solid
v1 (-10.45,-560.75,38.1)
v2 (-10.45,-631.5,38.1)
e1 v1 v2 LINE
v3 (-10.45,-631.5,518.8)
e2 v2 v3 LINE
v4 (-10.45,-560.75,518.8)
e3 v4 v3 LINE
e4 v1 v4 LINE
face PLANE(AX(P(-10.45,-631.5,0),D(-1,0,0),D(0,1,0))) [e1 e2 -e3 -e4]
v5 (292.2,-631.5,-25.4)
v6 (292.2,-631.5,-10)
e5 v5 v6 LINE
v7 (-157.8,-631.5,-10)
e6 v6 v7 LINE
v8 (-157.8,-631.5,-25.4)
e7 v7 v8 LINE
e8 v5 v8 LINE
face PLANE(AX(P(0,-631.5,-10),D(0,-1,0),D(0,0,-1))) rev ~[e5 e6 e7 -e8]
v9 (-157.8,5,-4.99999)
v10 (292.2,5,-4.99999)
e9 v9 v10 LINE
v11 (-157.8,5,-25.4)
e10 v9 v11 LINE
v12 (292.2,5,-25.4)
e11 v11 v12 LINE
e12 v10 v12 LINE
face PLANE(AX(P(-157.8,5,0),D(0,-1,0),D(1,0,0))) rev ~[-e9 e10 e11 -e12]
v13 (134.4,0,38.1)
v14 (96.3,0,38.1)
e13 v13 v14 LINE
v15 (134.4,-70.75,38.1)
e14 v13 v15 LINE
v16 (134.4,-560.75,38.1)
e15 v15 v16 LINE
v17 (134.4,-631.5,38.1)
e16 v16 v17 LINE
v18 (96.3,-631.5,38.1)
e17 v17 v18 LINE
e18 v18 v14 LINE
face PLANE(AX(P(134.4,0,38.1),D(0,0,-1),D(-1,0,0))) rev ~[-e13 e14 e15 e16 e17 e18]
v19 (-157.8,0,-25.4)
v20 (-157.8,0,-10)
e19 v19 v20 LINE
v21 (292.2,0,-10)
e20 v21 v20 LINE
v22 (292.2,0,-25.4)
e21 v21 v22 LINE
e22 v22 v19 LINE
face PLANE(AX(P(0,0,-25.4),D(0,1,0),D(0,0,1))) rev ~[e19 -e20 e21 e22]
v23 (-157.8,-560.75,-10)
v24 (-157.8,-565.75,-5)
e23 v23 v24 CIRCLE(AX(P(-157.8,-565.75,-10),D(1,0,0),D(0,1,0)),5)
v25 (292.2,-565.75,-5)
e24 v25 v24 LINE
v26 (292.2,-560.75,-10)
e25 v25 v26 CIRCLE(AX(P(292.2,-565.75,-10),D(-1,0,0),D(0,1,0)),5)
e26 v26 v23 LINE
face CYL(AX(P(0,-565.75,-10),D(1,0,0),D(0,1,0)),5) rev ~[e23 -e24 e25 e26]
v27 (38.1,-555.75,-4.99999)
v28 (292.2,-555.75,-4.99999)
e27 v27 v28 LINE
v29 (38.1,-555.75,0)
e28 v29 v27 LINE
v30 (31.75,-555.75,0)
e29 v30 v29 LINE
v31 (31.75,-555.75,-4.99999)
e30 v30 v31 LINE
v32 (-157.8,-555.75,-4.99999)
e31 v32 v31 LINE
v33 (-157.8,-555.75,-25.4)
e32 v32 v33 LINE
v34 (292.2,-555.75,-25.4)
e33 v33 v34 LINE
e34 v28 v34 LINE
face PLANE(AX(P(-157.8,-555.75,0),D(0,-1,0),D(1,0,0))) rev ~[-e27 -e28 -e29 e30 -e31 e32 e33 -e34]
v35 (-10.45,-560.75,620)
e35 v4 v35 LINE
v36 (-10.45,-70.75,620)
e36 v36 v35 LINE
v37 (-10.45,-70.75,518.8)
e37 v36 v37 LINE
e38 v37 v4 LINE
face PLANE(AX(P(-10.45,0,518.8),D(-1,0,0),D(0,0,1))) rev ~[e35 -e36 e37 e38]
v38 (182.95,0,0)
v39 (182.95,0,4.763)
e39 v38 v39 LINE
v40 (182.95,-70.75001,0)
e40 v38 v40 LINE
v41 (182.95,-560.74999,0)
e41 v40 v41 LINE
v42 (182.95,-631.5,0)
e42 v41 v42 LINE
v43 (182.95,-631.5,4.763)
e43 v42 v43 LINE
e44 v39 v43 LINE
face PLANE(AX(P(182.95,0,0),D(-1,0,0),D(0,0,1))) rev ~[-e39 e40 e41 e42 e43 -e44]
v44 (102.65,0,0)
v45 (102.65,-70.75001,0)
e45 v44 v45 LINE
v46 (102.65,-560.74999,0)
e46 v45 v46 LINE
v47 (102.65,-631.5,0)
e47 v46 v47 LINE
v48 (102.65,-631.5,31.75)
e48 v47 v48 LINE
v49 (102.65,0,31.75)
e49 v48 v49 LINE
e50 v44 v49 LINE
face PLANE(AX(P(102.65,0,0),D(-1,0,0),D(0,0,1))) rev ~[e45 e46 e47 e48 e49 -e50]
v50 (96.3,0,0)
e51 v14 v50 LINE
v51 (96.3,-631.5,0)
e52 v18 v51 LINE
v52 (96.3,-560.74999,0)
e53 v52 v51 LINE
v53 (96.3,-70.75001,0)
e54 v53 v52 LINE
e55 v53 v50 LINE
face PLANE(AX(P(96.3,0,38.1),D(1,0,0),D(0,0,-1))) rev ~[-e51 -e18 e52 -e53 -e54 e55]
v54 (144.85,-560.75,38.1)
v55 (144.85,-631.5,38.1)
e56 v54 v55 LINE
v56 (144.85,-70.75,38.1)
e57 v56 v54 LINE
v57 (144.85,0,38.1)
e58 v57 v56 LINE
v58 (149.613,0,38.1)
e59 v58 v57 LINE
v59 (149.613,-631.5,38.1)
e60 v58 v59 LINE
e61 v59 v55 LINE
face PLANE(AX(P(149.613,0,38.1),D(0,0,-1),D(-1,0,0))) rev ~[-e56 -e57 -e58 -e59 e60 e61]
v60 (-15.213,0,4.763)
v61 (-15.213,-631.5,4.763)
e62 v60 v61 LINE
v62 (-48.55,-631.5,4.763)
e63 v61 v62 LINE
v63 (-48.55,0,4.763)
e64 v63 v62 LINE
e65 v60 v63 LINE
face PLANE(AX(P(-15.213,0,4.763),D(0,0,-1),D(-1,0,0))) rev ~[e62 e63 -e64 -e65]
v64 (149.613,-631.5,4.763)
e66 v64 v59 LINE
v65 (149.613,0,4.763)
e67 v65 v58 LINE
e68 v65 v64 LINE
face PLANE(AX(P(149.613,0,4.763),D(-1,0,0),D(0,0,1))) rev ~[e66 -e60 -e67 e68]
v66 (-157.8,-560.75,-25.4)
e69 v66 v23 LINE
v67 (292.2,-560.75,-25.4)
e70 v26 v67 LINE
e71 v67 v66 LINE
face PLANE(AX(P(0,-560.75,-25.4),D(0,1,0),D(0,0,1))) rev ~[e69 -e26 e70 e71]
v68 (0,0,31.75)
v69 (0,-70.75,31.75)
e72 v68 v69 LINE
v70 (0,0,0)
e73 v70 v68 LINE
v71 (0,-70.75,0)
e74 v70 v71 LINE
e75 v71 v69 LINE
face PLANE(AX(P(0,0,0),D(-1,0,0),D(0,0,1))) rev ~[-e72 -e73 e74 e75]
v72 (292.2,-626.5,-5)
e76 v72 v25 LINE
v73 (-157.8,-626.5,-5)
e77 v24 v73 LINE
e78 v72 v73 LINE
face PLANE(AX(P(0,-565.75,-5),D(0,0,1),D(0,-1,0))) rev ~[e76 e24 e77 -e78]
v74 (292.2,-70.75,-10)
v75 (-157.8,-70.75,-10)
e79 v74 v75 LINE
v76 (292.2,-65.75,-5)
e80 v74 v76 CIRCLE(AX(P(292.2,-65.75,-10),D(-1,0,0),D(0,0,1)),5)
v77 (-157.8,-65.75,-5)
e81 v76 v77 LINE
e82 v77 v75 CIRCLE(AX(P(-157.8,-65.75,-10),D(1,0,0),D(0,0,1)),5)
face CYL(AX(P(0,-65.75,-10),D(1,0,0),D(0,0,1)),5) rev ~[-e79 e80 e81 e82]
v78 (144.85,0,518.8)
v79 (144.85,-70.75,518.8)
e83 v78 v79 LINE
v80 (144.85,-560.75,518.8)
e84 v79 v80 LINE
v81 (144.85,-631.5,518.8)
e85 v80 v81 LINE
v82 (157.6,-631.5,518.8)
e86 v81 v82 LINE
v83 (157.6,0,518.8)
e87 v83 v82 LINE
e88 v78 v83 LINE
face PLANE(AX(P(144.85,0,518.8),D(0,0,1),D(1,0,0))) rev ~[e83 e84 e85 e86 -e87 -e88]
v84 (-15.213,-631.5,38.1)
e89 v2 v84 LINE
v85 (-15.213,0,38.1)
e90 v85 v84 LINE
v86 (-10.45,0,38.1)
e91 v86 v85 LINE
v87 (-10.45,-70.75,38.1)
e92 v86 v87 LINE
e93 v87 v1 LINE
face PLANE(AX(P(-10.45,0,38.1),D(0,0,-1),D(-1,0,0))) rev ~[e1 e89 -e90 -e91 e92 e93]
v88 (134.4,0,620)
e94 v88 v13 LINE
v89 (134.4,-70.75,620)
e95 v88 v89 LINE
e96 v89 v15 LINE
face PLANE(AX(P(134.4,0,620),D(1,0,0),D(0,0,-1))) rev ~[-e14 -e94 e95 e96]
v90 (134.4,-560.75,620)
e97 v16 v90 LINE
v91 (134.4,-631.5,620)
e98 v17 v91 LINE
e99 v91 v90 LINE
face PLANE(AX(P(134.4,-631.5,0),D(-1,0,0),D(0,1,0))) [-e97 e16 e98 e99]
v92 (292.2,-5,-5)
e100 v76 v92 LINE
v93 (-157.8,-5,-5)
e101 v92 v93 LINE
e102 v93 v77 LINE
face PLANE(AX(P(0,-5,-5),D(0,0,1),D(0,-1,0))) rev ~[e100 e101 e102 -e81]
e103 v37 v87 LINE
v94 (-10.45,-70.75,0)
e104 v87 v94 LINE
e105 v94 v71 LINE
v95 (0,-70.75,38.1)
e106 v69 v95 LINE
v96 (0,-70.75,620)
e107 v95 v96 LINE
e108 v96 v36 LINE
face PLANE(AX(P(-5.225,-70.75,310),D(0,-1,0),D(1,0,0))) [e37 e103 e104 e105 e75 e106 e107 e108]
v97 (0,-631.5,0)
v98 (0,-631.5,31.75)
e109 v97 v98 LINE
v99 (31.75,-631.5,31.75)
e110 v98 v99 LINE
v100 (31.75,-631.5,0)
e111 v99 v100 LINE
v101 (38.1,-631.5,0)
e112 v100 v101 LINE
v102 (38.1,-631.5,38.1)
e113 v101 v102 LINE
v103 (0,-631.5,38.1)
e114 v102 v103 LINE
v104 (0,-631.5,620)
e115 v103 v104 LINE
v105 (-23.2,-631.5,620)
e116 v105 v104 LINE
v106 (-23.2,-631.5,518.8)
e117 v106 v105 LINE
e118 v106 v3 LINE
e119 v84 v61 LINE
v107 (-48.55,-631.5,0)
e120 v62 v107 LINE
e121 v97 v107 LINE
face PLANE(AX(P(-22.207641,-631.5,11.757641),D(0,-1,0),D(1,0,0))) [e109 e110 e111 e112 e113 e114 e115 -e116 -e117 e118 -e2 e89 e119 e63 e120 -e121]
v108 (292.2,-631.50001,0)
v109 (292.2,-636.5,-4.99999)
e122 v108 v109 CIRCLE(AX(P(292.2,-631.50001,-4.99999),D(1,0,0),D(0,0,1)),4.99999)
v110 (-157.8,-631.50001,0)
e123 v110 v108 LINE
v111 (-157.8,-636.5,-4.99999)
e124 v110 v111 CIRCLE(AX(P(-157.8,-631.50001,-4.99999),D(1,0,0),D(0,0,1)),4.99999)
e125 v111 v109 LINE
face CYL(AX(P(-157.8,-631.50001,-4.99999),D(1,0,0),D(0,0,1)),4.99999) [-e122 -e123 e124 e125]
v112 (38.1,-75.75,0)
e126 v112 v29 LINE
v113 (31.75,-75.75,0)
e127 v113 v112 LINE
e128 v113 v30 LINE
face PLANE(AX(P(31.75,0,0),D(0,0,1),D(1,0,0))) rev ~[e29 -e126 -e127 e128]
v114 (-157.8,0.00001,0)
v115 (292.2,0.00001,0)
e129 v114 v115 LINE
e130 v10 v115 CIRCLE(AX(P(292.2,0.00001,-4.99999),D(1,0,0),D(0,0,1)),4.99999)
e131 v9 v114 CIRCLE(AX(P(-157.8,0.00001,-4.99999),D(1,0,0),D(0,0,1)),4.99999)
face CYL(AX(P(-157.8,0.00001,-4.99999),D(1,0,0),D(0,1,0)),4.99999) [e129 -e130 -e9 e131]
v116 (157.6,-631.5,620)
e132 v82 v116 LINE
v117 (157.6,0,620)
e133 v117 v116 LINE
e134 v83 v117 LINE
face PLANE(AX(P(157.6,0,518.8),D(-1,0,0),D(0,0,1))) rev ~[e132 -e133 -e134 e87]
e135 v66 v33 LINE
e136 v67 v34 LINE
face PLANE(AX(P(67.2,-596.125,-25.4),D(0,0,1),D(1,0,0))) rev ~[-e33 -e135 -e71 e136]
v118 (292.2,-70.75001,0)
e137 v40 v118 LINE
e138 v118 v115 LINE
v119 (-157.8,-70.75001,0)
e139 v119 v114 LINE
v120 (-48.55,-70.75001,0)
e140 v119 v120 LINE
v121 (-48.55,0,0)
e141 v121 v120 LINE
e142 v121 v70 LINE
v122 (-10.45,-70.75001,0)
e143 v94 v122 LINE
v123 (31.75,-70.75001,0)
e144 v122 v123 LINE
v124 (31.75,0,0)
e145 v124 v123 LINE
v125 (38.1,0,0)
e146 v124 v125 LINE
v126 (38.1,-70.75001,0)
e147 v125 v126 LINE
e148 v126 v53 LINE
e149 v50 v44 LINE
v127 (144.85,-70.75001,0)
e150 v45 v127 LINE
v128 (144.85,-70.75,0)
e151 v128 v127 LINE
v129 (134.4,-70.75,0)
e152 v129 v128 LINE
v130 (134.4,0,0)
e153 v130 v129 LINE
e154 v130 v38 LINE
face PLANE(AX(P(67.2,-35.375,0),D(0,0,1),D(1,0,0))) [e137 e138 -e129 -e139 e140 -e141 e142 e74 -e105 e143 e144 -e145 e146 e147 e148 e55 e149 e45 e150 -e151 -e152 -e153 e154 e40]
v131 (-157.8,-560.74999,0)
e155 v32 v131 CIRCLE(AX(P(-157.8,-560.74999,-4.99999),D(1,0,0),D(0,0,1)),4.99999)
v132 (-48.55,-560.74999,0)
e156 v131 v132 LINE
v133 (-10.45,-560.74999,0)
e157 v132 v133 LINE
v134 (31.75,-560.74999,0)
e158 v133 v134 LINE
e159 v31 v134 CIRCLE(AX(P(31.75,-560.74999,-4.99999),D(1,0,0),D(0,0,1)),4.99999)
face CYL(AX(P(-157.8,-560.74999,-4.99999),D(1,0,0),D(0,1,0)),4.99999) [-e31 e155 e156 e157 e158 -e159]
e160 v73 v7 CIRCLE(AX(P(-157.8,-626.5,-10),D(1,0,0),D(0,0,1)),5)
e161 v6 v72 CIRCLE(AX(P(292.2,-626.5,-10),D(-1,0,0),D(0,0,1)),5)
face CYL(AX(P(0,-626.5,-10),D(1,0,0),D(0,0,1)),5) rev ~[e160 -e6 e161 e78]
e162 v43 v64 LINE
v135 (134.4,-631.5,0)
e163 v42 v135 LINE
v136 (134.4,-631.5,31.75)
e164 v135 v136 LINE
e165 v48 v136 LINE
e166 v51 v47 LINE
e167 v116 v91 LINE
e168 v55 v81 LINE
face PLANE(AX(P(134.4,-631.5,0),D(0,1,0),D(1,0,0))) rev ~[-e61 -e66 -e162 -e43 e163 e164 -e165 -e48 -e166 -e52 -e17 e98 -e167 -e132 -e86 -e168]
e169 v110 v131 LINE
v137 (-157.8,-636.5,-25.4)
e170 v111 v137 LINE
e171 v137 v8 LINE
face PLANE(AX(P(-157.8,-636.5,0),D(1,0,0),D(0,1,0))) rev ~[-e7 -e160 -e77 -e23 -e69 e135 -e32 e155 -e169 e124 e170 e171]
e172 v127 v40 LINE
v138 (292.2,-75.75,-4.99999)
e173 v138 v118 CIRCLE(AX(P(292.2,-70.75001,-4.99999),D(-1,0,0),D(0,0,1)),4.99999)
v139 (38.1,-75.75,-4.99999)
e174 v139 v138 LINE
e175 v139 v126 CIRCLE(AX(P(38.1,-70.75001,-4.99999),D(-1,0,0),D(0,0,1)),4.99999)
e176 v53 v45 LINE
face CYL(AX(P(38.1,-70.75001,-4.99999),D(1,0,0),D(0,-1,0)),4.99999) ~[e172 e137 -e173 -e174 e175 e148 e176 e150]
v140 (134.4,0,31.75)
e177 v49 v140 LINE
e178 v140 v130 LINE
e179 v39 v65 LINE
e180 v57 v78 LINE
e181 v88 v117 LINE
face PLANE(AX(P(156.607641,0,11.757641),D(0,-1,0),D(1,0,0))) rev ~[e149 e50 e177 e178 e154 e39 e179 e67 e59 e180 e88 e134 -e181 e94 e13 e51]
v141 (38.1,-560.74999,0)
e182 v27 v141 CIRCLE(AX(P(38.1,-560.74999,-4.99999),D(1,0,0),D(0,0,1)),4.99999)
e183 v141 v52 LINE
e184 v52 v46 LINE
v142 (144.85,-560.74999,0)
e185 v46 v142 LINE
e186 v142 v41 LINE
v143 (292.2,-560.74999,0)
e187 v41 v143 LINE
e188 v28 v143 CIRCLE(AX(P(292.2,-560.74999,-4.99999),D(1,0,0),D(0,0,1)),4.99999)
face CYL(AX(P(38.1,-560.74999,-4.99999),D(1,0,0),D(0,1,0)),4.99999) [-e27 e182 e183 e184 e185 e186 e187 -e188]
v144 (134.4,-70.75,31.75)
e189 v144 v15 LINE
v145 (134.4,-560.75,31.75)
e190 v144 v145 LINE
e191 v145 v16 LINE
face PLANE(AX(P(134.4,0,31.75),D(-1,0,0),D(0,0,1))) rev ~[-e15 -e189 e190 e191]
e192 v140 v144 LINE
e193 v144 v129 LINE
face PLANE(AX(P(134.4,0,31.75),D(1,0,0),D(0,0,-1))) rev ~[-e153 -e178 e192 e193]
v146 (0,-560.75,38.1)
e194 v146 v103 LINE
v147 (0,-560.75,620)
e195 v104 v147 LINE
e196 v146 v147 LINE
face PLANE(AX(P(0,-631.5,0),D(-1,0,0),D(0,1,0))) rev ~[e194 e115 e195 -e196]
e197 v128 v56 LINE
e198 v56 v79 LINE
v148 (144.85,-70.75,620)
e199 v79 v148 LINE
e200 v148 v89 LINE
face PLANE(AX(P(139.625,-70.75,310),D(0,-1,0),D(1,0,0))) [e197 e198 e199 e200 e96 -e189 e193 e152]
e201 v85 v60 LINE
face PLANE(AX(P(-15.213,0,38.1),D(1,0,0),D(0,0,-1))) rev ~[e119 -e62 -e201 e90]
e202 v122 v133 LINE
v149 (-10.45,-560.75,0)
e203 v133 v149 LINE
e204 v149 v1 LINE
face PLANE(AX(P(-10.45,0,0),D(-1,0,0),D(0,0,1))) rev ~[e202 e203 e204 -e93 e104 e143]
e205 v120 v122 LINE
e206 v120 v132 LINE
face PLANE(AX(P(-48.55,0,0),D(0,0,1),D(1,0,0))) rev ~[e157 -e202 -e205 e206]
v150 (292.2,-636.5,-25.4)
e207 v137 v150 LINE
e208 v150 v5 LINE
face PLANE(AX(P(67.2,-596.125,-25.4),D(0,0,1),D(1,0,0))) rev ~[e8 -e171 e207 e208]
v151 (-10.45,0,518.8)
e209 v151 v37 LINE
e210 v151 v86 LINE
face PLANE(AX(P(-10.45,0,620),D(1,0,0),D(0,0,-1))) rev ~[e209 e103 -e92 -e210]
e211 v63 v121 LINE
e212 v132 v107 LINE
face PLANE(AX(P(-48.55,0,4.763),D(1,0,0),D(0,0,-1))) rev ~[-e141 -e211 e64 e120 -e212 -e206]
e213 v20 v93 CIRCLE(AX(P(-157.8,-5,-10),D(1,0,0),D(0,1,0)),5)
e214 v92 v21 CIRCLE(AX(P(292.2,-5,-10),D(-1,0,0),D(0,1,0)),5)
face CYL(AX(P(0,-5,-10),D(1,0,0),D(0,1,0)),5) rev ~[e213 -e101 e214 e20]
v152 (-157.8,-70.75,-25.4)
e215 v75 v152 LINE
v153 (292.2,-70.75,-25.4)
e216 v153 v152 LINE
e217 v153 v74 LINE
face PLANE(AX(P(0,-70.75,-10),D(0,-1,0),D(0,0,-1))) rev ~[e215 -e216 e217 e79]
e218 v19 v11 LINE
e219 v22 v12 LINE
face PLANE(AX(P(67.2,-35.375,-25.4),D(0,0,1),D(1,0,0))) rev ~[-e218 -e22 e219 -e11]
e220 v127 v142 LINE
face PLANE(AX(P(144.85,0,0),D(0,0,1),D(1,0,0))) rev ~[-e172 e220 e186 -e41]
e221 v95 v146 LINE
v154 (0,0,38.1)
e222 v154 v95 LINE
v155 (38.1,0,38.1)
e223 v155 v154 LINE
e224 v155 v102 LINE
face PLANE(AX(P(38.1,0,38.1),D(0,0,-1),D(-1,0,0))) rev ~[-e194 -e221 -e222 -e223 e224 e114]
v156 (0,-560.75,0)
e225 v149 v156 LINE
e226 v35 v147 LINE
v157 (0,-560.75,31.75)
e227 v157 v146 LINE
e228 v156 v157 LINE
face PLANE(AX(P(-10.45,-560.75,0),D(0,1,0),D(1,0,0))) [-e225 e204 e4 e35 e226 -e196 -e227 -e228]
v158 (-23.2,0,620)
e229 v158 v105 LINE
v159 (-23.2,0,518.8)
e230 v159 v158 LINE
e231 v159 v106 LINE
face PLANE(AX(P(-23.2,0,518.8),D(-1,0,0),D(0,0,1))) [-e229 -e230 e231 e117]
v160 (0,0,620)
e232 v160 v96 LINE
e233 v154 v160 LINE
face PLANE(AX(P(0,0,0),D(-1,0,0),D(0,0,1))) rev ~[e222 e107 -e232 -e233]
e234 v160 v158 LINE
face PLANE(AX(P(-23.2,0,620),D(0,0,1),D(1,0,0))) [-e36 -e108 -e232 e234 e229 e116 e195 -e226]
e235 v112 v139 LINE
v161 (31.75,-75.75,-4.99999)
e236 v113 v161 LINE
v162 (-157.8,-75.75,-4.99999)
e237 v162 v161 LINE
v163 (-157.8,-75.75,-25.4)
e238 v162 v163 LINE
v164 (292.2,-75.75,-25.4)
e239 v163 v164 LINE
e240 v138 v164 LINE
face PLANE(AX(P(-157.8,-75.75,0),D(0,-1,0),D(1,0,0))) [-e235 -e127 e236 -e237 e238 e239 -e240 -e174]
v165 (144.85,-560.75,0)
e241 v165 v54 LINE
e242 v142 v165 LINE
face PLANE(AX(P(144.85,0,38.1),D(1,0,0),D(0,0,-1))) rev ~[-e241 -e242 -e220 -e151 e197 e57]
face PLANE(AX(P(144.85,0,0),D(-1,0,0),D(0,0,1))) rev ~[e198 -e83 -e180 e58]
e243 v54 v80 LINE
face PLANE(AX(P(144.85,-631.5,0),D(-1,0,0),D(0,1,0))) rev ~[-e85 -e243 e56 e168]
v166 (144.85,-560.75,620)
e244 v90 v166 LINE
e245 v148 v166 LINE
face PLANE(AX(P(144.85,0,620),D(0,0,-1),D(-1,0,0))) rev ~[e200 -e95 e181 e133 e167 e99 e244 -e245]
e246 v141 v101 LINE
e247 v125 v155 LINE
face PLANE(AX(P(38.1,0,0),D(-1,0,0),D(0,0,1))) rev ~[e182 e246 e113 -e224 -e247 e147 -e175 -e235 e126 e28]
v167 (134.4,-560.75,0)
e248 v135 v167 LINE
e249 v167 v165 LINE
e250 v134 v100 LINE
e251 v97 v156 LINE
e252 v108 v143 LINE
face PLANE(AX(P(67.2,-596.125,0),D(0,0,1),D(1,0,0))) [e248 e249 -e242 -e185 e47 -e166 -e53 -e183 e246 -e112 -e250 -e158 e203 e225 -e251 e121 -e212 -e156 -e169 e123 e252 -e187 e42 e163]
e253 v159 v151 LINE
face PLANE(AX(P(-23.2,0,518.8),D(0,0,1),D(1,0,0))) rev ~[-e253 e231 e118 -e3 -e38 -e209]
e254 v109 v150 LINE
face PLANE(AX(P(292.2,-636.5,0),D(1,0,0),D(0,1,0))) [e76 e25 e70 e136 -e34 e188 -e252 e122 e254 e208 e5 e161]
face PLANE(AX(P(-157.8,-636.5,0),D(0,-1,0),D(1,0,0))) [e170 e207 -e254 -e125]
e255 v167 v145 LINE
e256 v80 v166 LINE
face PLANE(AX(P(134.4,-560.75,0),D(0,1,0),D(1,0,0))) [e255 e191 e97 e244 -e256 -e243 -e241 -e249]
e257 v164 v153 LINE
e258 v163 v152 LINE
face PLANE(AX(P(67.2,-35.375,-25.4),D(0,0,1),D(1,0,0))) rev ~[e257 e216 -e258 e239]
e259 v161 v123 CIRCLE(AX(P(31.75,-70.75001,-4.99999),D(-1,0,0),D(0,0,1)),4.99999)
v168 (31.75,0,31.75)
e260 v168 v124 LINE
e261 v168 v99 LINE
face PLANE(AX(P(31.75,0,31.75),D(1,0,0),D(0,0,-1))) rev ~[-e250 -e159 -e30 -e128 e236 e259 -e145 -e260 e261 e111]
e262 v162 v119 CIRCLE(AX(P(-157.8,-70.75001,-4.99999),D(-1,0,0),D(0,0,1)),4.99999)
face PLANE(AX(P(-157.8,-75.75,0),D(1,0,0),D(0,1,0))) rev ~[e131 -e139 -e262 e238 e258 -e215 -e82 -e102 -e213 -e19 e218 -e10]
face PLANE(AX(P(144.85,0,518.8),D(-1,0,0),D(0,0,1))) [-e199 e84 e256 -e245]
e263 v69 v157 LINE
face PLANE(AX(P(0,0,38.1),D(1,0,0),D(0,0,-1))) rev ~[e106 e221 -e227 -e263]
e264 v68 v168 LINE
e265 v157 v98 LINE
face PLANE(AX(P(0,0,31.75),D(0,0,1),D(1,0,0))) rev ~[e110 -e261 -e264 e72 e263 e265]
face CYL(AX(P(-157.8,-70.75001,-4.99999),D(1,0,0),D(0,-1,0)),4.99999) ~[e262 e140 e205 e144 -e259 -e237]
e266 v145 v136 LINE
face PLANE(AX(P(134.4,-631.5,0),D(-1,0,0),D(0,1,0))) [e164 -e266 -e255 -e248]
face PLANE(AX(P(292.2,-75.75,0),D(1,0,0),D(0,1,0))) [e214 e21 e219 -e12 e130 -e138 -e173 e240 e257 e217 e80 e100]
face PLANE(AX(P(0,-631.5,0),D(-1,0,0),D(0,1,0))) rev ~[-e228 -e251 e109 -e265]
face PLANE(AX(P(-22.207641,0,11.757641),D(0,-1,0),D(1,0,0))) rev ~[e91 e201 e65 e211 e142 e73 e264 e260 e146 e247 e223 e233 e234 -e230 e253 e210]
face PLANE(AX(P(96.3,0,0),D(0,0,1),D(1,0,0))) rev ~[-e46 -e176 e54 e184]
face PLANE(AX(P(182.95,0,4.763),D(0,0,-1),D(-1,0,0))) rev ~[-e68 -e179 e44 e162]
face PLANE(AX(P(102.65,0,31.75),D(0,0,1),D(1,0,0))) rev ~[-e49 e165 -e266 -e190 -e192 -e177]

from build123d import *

# Parameters (mm, degrees)
F1_DEPTH  = 631.5
F2_DEPTH  = 70.75
F3_W      = 10.45
F3_H      = 70.75
F4_DEPTH  = 620
F5_W      = 450
F5_H      = 80.75
F6_DEPTH  = 25.4
F7_R      = 4.99999
F9_DEPTH  = 631.5
F10_DEPTH = 70.75
F11_W     = 10.45
F11_H     = 70.75
F12_DEPTH = 620
F13_W     = 12.75
F13_H     = 101.2
F14_DEPTH = 631.5
F16_DEPTH = 631.5
F18_DEPTH = 300
F19_DEPTH = 300


# Not quite as in the source:
# - a fillet or chamfer is up to 0.001 mm smaller than in the source, because OpenCascade refuses the exact size


with BuildPart() as f1:
    # F0 (on Front) → F1 (new body)
    with BuildSketch(Plane.XZ):
        Polygon((0, 38.1), (0, 31.75), (31.75, 31.75), (31.75, 0), (38.1, 0), (38.1, 38.1), align=None)
    extrude(amount=F1_DEPTH)

    # F0 (on Front) → F2 (join)
    with BuildSketch(Plane.XZ):
        Polygon((-10.45, 0), (0, 0), (0, 31.75), (0, 38.1), (0, 620), (-10.45, 620), align=None)
    extrude(amount=F2_DEPTH)

    # F3 (on Top) → F4 (join)
    with BuildSketch(Plane.XY):
        with Locations((-5.225, -596.125)):
            Rectangle(F3_W, F3_H)
    extrude(amount=F4_DEPTH)

    # F5 (on Top) → F6 (join)
    with BuildSketch(Plane.XY):
        with Locations((67.2, -35.375)):
            Rectangle(F5_W, F5_H)
        with Locations((67.2, -596.125)):
            Rectangle(F5_W, F5_H)
    extrude(amount=-F6_DEPTH)

    # F7 (radius 5 in the source; OpenCascade refuses exactly that, so slightly less here)
    f7_edges = [f1.edges().sort_by_distance(p)[0] for p in [
        (67.2, -636.5, 0),
        (165.15, -555.75, 0),
        (165.15, -75.75, 0),
        (67.2, 5, 0),
        (-63.025, -75.75, 0),
        (-63.025, -555.75, 0),
    ]]
    fillet(f7_edges, radius=F7_R)

    # F8 (on Front) → F9 (join)
    with BuildSketch(Plane.XZ):
        Polygon((102.65, 31.75), (134.4, 31.75), (134.4, 38.1), (96.3, 38.1), (96.3, 0), (102.65, 0), align=None)
    extrude(amount=F9_DEPTH)

    # F8 (on Front) → F10 (join)
    with BuildSketch(Plane.XZ):
        Polygon((134.4, 31.75), (134.4, 0), (144.85, 0), (144.85, 620), (134.4, 620), (134.4, 38.1), align=None)
        Polygon((102.65, 31.75), (134.4, 31.75), (134.4, 38.1), (96.3, 38.1), (96.3, 0), (102.65, 0), align=None)
    extrude(amount=F10_DEPTH)

    # F11 (on Top) → F12 (join)
    with BuildSketch(Plane.XY):
        with Locations((139.625, -596.125)):
            Rectangle(F11_W, F11_H)
    extrude(amount=F12_DEPTH)

    # F13 (on Front) → F14 (join)
    with BuildSketch(Plane.XZ):
        with Locations((-16.825, 569.4)):
            Rectangle(F13_W, F13_H)
        with Locations((151.225, 569.4)):
            Rectangle(F13_W, F13_H)
    extrude(amount=F14_DEPTH)

    # F15 (on Front) → F16 (join)
    with BuildSketch(Plane.XZ):
        Polygon((-48.55, 4.763), (-48.55, 0), (-10.45, 0), (-10.45, 38.1), (-15.213, 38.1), (-15.213, 4.763), align=None)
        Polygon((144.85, 0), (182.95, 0), (182.95, 4.763), (149.613, 4.763), (149.613, 38.1), (144.85, 38.1), align=None)
    extrude(amount=F16_DEPTH)

    # F17 (on Right) → F18 (cut)
    with BuildSketch(Plane.YZ):
        with BuildLine():
            Line((-631.5, -10), (-631.5, -25.4))
            Line((-631.5, -25.4), (-560.75, -25.4))
            Line((-560.75, -25.4), (-560.75, -10))
            ThreePointArc((-560.75, -10), (-562.2144660941, -6.4644660941), (-565.75, -5))
            Line((-565.75, -5), (-626.5, -5))
            ThreePointArc((-626.5, -5), (-630.0355339059, -6.4644660941), (-631.5, -10))
        make_face()
        with BuildLine():
            Line((-5, -5), (-65.75, -5))
            ThreePointArc((-65.75, -5), (-69.2855339059, -6.4644660941), (-70.75, -10))
            Line((-70.75, -10), (-70.75, -25.4))
            Line((-70.75, -25.4), (0, -25.4))
            Line((0, -25.4), (0, -10))
            ThreePointArc((0, -10), (-1.4644660941, -6.4644660941), (-5, -5))
        make_face()
    extrude(amount=F18_DEPTH, mode=Mode.SUBTRACT)

    # F17 (on Right) → F19 (cut)
    with BuildSketch(Plane.YZ):
        with BuildLine():
            Line((-631.5, -10), (-631.5, -25.4))
            Line((-631.5, -25.4), (-560.75, -25.4))
            Line((-560.75, -25.4), (-560.75, -10))
            ThreePointArc((-560.75, -10), (-562.2144660941, -6.4644660941), (-565.75, -5))
            Line((-565.75, -5), (-626.5, -5))
            ThreePointArc((-626.5, -5), (-630.0355339059, -6.4644660941), (-631.5, -10))
        make_face()
        with BuildLine():
            Line((-5, -5), (-65.75, -5))
            ThreePointArc((-65.75, -5), (-69.2855339059, -6.4644660941), (-70.75, -10))
            Line((-70.75, -10), (-70.75, -25.4))
            Line((-70.75, -25.4), (0, -25.4))
            Line((0, -25.4), (0, -10))
            ThreePointArc((0, -10), (-1.4644660941, -6.4644660941), (-5, -5))
        make_face()
    extrude(amount=-F19_DEPTH, mode=Mode.SUBTRACT)


solid = f1.part
